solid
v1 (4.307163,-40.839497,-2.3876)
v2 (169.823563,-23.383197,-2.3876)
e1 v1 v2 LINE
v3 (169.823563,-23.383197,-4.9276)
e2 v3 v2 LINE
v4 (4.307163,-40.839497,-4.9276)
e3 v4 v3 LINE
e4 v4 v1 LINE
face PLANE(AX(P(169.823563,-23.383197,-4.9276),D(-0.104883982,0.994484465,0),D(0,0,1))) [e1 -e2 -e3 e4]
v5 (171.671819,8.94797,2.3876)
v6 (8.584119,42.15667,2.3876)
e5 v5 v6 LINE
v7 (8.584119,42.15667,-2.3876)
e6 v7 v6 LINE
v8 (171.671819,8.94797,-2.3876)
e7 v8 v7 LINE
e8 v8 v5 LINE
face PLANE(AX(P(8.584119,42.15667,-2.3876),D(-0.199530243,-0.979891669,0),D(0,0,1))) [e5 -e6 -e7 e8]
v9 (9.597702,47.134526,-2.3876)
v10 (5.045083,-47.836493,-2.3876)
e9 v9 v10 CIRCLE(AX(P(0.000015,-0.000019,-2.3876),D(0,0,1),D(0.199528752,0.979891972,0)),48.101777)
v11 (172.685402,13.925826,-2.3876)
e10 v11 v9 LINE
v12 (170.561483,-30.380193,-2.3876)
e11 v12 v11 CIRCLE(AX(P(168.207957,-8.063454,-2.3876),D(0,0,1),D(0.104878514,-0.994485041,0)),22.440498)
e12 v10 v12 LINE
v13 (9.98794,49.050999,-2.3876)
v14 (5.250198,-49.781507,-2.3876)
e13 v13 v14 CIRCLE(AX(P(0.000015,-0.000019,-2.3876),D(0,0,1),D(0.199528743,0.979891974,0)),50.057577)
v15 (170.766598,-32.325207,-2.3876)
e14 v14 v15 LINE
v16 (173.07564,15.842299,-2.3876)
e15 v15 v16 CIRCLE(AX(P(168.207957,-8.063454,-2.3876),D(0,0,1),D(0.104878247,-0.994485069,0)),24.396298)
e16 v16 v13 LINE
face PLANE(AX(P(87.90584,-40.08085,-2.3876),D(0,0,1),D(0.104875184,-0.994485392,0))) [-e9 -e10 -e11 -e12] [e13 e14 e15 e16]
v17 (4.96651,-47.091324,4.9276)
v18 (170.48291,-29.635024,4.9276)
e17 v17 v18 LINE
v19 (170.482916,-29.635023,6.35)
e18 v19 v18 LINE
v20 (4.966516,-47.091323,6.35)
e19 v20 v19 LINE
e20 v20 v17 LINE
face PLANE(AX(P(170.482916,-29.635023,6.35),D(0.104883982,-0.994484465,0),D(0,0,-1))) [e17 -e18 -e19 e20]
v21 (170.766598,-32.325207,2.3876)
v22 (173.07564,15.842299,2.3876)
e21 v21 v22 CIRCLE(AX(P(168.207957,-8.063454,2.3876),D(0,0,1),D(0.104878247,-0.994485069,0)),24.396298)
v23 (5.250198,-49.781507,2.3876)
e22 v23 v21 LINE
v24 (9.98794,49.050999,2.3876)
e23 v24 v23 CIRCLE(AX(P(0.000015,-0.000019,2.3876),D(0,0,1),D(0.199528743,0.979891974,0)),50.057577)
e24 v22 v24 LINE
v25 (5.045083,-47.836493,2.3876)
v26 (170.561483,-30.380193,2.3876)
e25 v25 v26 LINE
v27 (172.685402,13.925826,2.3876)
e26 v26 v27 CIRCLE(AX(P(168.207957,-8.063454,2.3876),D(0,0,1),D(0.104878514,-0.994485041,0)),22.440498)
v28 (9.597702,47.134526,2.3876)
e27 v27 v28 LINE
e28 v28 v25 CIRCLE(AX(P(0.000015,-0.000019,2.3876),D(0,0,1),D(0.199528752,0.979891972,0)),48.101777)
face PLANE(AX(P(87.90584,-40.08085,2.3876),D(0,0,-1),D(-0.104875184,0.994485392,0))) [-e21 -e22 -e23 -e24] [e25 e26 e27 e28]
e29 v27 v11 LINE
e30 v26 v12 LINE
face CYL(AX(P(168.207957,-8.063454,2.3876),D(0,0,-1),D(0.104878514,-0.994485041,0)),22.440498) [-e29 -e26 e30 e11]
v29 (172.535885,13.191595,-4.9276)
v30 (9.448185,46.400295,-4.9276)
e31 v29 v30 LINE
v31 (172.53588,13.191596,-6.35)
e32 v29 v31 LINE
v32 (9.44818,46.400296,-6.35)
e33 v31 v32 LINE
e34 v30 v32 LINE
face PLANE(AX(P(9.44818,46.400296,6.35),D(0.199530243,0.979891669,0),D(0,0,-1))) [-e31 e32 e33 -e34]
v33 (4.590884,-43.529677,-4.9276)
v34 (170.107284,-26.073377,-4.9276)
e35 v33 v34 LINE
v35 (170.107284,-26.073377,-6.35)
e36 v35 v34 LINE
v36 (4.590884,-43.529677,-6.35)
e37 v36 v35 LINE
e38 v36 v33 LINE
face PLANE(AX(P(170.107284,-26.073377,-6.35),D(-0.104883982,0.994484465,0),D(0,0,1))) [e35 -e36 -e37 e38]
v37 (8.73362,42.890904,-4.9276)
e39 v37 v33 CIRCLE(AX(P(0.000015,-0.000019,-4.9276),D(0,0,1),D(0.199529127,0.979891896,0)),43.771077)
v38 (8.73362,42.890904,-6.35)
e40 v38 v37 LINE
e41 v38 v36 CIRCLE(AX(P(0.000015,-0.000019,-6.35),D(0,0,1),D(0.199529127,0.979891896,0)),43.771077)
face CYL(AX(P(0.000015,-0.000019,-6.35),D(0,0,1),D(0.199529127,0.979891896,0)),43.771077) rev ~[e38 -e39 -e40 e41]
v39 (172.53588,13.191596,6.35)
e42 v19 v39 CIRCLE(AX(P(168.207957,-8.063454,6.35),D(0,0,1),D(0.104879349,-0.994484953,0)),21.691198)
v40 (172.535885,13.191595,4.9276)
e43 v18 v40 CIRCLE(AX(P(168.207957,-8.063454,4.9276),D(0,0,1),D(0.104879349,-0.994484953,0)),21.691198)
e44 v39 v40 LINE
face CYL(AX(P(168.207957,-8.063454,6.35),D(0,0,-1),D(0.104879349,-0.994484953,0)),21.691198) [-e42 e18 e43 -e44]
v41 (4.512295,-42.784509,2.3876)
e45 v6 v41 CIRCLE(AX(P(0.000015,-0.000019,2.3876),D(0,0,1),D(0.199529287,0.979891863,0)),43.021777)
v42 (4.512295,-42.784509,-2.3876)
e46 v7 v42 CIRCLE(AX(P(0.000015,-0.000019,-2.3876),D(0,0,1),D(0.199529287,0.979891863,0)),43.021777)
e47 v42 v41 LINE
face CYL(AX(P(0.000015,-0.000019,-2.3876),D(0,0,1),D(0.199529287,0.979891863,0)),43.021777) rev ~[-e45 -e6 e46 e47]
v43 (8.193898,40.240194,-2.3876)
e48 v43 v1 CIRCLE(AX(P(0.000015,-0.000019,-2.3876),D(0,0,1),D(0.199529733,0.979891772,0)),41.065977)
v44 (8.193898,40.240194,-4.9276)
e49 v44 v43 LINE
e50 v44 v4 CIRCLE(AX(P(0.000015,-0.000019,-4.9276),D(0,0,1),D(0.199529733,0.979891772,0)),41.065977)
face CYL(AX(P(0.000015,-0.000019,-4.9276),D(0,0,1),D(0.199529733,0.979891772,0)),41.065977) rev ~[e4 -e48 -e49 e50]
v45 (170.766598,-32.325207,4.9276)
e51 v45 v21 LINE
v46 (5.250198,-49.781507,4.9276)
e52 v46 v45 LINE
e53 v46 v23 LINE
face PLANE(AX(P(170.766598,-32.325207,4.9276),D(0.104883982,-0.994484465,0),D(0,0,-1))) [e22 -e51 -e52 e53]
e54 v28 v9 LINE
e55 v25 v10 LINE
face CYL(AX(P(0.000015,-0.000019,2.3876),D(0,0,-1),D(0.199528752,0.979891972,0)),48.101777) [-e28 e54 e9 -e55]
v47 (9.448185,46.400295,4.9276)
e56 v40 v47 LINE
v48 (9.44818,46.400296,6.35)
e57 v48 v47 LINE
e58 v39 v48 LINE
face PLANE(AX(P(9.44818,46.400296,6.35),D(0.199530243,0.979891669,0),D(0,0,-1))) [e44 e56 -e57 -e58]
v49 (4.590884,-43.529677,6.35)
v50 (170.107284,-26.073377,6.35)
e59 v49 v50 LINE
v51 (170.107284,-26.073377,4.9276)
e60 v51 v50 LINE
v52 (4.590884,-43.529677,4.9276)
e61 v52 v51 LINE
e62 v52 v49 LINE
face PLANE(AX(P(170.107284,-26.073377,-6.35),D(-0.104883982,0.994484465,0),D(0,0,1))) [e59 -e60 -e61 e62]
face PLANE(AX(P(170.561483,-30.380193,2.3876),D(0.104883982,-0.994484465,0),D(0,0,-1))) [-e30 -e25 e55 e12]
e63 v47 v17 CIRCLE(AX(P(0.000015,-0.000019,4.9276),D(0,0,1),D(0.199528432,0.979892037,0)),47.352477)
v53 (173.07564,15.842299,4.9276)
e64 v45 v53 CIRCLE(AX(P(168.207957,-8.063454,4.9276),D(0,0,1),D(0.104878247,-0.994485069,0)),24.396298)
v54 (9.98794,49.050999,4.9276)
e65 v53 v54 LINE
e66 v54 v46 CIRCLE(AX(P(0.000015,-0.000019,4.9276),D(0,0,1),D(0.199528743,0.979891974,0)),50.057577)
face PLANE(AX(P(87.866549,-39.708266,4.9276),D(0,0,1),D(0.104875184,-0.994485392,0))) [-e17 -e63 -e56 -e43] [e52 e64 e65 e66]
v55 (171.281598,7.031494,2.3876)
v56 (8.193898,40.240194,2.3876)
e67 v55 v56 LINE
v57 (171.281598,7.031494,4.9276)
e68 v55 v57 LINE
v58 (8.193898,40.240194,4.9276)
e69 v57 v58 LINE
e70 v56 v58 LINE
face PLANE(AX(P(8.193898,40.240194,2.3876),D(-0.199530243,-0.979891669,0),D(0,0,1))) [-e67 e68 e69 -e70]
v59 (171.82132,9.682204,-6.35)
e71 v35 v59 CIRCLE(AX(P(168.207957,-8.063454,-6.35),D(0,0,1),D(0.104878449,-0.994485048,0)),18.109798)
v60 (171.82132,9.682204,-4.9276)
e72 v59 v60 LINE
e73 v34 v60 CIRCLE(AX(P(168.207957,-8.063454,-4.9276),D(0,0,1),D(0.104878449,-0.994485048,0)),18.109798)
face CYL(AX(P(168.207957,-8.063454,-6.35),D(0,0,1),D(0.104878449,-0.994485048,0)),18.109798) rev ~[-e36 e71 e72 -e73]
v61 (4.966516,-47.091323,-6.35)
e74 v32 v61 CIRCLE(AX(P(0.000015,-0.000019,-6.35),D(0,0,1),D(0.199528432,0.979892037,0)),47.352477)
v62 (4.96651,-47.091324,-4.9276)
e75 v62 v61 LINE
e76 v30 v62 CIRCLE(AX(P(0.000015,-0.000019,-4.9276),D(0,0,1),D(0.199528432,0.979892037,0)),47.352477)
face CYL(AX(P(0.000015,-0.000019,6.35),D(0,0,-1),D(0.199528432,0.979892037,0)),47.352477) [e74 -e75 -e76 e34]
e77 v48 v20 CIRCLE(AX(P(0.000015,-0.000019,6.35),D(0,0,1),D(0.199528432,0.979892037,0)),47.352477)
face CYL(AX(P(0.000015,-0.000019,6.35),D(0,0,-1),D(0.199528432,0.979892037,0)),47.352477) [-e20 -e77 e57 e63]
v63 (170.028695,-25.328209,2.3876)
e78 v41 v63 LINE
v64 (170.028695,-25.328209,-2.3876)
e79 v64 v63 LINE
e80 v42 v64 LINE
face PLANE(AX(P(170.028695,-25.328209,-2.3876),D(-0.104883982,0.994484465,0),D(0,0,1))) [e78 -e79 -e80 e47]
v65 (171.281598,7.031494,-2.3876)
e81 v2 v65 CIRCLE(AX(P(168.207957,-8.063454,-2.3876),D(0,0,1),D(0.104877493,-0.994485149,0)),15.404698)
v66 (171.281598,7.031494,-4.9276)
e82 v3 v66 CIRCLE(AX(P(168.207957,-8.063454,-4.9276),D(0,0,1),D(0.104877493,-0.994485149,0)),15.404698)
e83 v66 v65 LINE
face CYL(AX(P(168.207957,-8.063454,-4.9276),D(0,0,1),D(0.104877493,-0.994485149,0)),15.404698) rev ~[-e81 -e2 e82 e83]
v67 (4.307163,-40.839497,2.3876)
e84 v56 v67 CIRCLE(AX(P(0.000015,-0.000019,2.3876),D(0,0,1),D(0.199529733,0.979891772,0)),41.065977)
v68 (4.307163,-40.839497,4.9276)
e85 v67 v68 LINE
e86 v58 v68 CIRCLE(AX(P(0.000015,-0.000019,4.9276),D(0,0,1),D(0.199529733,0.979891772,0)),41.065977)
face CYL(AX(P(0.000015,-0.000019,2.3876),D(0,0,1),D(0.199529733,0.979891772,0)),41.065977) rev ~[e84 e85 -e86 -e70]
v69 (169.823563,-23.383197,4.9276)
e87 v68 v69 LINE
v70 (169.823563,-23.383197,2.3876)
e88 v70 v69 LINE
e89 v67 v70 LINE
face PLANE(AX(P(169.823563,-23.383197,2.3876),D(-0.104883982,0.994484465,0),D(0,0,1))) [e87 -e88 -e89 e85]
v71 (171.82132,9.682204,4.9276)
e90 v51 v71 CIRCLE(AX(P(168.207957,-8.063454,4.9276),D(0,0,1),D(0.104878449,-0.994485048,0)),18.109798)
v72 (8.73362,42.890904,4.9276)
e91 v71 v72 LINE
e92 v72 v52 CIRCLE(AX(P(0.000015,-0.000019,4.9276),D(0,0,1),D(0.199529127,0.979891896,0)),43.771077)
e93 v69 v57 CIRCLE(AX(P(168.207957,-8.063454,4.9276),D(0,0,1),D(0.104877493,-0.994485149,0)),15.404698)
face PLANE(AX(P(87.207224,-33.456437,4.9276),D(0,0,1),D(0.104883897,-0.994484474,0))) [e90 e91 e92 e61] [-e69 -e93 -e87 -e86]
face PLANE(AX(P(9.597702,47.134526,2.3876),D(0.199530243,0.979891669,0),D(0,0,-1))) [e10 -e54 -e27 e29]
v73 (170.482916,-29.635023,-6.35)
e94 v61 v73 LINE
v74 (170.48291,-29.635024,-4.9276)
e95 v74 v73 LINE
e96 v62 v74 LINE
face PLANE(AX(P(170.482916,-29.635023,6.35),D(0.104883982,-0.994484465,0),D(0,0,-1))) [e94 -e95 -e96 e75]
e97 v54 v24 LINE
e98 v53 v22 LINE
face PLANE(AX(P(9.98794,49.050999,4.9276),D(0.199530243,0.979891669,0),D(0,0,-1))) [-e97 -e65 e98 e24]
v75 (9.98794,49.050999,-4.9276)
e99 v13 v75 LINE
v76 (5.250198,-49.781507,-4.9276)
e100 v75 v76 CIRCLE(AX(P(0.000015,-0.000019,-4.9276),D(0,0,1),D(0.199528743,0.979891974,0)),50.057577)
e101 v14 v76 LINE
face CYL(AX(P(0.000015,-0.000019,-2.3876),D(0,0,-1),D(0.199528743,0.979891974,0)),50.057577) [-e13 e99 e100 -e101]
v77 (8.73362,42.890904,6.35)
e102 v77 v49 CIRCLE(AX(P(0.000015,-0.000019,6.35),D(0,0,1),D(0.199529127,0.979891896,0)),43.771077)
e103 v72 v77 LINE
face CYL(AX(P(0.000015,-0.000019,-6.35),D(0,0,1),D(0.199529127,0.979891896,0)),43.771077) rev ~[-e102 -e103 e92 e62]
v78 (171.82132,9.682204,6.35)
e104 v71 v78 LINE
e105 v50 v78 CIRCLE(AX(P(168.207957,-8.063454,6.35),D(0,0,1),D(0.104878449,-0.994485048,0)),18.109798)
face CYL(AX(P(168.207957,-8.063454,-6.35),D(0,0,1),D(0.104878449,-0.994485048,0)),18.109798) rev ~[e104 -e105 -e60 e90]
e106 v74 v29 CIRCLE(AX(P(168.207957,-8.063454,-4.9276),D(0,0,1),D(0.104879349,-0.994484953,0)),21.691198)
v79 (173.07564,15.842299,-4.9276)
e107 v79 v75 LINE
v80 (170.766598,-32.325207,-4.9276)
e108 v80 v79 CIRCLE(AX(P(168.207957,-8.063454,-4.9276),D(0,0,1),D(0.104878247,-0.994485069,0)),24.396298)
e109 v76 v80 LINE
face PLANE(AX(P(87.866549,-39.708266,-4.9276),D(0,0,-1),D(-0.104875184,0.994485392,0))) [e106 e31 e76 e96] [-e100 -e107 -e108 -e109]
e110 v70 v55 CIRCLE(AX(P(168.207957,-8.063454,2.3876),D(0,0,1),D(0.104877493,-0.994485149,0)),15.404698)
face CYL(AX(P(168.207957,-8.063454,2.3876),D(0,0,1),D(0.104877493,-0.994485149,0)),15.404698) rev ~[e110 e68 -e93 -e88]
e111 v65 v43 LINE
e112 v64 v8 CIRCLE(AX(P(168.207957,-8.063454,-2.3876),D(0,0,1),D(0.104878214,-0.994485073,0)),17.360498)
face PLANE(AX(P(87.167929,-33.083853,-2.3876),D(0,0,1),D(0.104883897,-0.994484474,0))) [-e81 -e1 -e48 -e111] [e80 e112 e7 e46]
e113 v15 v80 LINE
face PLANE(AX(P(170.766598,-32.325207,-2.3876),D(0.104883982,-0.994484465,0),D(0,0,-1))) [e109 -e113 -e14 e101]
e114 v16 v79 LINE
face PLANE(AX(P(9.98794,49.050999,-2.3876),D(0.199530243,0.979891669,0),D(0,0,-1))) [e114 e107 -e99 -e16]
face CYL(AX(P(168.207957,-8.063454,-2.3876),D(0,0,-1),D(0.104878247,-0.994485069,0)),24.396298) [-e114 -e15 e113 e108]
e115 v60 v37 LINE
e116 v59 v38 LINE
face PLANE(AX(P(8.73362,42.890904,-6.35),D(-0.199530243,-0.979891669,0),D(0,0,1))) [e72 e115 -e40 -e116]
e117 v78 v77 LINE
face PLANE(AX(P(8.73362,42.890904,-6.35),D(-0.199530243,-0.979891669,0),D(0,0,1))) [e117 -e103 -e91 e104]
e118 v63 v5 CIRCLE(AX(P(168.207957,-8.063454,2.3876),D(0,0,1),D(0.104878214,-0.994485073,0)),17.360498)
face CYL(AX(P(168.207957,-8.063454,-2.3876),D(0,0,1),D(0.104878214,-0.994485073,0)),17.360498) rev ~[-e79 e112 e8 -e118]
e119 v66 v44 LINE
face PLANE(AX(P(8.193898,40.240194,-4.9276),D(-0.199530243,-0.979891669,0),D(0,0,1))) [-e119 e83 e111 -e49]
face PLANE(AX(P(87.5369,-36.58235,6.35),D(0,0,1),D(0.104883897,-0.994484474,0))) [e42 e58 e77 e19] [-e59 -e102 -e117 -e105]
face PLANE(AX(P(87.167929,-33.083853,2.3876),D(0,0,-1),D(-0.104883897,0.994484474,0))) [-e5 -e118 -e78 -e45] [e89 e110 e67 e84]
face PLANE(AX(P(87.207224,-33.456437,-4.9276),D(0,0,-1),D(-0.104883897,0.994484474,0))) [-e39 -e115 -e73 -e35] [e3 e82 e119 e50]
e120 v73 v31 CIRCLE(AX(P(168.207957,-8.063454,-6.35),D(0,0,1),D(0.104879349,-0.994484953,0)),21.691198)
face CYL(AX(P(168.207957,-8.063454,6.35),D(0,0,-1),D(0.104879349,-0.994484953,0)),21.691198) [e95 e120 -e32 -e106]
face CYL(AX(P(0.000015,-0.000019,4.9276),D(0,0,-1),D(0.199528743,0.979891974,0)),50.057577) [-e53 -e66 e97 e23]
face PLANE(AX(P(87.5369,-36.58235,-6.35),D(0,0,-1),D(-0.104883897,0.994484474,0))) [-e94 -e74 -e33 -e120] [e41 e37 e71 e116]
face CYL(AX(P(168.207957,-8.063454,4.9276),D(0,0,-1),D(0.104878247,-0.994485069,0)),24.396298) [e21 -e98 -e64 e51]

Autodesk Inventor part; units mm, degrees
ref_plane "Work Plane2" through (0, 0, 0) normal (-1, 0, 0) x (0, 0, 1)
ref_plane "Work Plane3" through (168.2079, -8.0634, 0) normal (-0.8895411, 0.4568551, 0) x (0, 0, 1)
sketch "Path" plane through (0, 0, 0) normal (0, 0, 1) x (1, 0, 0)
  arc A0 (9.0909, 44.6456) -> (4.7787, -45.3105) centre (0, 0) ccw
  arc A1 (170.2951, -27.8542) -> (172.1786, 11.4369) centre (168.2079, -8.0634) ccw
  line L0 (170.2951, -27.8542) -> (4.7787, -45.3105)
  line L1 (9.0909, 44.6456) -> (172.1786, 11.4369)
  dimension "d31" = 8.9916
ref_plane "Section Plane" through (4.7787, -45.3105, 0) normal (0.9944845, 0.1048839, 0) x (0, 0, 1)
sketch "Section Sketch" plane through (4.7787, -45.3105, 0) normal (0.9944845, 0.1048839, 0) x (0, 0, 1)
  line L0 (-6.35, -1.7907) -> (6.35, -1.7907)
  line L1 (6.35, -1.7907) -> (6.35, 1.7907)
  line L2 (6.35, 1.7907) -> (-6.35, 1.7907)
  line L3 (-6.35, 1.7907) -> (-6.35, -1.7907)
  line L4 (-2.3876, -2.54) -> (2.3876, -2.54)
  line L5 (2.3876, -2.54) -> (2.3876, 2.54)
  line L6 (2.3876, 2.54) -> (-2.3876, 2.54)
  line L7 (-2.3876, 2.54) -> (-2.3876, -2.54)
  line L8 (-2.3876, 0) -> (2.3876, 0) construction
  line L9 (-4.9276, -4.4958) -> (-2.3876, -4.4958)
  line L10 (-2.3876, -4.4958) -> (-2.3876, 4.4958)
  line L11 (-2.3876, 4.4958) -> (-4.9276, 4.4958)
  line L12 (-4.9276, 4.4958) -> (-4.9276, -4.4958)
  line L13 (2.3876, -4.4958) -> (4.9276, -4.4958)
  line L14 (4.9276, -4.4958) -> (4.9276, 4.4958)
  line L15 (4.9276, 4.4958) -> (2.3876, 4.4958)
  line L16 (2.3876, 4.4958) -> (2.3876, -4.4958)
  line L17 (-6.35, 0) -> (6.35, 0) construction
  point P0 (0, 0)
  point P1 (0, 0)
  dimension "d21" = 3.5814
  dimension "d22" = 5.08
  dimension "d23" = 4.7752
  dimension "d24" = 2.54
  dimension "d31" = 8.9916
  dimension "d32" = 12.7
sweep "Solid" add profiles "Section Sketch" path "Path"
pattern_of_one "Strand Pattern"
equation "\"d21\" = da_d2"
equation "\"d22\" = da_d1"
equation "\"d23\" = da_b1"
equation "\"d24\" = da_t1 + da_t2"
equation "\"d30\" = da_pt"
equation "\"da_p\" = 9.525"
equation "\"da_b1\" = 4.7752"
equation "\"da_h2\" = 8.9916"
equation "\"da_h3\" = 7.7978"
equation "\"da_d1\" = 5.08"
equation "\"da_d2\" = 3.5814"
equation "\"da_pt\" = 10.1346"
equation "\"da_b\" = 12.7"
equation "\"da_t1\" = 1.27"
equation "\"da_t2\" = 1.27"
properties part number "Roller Chain"
